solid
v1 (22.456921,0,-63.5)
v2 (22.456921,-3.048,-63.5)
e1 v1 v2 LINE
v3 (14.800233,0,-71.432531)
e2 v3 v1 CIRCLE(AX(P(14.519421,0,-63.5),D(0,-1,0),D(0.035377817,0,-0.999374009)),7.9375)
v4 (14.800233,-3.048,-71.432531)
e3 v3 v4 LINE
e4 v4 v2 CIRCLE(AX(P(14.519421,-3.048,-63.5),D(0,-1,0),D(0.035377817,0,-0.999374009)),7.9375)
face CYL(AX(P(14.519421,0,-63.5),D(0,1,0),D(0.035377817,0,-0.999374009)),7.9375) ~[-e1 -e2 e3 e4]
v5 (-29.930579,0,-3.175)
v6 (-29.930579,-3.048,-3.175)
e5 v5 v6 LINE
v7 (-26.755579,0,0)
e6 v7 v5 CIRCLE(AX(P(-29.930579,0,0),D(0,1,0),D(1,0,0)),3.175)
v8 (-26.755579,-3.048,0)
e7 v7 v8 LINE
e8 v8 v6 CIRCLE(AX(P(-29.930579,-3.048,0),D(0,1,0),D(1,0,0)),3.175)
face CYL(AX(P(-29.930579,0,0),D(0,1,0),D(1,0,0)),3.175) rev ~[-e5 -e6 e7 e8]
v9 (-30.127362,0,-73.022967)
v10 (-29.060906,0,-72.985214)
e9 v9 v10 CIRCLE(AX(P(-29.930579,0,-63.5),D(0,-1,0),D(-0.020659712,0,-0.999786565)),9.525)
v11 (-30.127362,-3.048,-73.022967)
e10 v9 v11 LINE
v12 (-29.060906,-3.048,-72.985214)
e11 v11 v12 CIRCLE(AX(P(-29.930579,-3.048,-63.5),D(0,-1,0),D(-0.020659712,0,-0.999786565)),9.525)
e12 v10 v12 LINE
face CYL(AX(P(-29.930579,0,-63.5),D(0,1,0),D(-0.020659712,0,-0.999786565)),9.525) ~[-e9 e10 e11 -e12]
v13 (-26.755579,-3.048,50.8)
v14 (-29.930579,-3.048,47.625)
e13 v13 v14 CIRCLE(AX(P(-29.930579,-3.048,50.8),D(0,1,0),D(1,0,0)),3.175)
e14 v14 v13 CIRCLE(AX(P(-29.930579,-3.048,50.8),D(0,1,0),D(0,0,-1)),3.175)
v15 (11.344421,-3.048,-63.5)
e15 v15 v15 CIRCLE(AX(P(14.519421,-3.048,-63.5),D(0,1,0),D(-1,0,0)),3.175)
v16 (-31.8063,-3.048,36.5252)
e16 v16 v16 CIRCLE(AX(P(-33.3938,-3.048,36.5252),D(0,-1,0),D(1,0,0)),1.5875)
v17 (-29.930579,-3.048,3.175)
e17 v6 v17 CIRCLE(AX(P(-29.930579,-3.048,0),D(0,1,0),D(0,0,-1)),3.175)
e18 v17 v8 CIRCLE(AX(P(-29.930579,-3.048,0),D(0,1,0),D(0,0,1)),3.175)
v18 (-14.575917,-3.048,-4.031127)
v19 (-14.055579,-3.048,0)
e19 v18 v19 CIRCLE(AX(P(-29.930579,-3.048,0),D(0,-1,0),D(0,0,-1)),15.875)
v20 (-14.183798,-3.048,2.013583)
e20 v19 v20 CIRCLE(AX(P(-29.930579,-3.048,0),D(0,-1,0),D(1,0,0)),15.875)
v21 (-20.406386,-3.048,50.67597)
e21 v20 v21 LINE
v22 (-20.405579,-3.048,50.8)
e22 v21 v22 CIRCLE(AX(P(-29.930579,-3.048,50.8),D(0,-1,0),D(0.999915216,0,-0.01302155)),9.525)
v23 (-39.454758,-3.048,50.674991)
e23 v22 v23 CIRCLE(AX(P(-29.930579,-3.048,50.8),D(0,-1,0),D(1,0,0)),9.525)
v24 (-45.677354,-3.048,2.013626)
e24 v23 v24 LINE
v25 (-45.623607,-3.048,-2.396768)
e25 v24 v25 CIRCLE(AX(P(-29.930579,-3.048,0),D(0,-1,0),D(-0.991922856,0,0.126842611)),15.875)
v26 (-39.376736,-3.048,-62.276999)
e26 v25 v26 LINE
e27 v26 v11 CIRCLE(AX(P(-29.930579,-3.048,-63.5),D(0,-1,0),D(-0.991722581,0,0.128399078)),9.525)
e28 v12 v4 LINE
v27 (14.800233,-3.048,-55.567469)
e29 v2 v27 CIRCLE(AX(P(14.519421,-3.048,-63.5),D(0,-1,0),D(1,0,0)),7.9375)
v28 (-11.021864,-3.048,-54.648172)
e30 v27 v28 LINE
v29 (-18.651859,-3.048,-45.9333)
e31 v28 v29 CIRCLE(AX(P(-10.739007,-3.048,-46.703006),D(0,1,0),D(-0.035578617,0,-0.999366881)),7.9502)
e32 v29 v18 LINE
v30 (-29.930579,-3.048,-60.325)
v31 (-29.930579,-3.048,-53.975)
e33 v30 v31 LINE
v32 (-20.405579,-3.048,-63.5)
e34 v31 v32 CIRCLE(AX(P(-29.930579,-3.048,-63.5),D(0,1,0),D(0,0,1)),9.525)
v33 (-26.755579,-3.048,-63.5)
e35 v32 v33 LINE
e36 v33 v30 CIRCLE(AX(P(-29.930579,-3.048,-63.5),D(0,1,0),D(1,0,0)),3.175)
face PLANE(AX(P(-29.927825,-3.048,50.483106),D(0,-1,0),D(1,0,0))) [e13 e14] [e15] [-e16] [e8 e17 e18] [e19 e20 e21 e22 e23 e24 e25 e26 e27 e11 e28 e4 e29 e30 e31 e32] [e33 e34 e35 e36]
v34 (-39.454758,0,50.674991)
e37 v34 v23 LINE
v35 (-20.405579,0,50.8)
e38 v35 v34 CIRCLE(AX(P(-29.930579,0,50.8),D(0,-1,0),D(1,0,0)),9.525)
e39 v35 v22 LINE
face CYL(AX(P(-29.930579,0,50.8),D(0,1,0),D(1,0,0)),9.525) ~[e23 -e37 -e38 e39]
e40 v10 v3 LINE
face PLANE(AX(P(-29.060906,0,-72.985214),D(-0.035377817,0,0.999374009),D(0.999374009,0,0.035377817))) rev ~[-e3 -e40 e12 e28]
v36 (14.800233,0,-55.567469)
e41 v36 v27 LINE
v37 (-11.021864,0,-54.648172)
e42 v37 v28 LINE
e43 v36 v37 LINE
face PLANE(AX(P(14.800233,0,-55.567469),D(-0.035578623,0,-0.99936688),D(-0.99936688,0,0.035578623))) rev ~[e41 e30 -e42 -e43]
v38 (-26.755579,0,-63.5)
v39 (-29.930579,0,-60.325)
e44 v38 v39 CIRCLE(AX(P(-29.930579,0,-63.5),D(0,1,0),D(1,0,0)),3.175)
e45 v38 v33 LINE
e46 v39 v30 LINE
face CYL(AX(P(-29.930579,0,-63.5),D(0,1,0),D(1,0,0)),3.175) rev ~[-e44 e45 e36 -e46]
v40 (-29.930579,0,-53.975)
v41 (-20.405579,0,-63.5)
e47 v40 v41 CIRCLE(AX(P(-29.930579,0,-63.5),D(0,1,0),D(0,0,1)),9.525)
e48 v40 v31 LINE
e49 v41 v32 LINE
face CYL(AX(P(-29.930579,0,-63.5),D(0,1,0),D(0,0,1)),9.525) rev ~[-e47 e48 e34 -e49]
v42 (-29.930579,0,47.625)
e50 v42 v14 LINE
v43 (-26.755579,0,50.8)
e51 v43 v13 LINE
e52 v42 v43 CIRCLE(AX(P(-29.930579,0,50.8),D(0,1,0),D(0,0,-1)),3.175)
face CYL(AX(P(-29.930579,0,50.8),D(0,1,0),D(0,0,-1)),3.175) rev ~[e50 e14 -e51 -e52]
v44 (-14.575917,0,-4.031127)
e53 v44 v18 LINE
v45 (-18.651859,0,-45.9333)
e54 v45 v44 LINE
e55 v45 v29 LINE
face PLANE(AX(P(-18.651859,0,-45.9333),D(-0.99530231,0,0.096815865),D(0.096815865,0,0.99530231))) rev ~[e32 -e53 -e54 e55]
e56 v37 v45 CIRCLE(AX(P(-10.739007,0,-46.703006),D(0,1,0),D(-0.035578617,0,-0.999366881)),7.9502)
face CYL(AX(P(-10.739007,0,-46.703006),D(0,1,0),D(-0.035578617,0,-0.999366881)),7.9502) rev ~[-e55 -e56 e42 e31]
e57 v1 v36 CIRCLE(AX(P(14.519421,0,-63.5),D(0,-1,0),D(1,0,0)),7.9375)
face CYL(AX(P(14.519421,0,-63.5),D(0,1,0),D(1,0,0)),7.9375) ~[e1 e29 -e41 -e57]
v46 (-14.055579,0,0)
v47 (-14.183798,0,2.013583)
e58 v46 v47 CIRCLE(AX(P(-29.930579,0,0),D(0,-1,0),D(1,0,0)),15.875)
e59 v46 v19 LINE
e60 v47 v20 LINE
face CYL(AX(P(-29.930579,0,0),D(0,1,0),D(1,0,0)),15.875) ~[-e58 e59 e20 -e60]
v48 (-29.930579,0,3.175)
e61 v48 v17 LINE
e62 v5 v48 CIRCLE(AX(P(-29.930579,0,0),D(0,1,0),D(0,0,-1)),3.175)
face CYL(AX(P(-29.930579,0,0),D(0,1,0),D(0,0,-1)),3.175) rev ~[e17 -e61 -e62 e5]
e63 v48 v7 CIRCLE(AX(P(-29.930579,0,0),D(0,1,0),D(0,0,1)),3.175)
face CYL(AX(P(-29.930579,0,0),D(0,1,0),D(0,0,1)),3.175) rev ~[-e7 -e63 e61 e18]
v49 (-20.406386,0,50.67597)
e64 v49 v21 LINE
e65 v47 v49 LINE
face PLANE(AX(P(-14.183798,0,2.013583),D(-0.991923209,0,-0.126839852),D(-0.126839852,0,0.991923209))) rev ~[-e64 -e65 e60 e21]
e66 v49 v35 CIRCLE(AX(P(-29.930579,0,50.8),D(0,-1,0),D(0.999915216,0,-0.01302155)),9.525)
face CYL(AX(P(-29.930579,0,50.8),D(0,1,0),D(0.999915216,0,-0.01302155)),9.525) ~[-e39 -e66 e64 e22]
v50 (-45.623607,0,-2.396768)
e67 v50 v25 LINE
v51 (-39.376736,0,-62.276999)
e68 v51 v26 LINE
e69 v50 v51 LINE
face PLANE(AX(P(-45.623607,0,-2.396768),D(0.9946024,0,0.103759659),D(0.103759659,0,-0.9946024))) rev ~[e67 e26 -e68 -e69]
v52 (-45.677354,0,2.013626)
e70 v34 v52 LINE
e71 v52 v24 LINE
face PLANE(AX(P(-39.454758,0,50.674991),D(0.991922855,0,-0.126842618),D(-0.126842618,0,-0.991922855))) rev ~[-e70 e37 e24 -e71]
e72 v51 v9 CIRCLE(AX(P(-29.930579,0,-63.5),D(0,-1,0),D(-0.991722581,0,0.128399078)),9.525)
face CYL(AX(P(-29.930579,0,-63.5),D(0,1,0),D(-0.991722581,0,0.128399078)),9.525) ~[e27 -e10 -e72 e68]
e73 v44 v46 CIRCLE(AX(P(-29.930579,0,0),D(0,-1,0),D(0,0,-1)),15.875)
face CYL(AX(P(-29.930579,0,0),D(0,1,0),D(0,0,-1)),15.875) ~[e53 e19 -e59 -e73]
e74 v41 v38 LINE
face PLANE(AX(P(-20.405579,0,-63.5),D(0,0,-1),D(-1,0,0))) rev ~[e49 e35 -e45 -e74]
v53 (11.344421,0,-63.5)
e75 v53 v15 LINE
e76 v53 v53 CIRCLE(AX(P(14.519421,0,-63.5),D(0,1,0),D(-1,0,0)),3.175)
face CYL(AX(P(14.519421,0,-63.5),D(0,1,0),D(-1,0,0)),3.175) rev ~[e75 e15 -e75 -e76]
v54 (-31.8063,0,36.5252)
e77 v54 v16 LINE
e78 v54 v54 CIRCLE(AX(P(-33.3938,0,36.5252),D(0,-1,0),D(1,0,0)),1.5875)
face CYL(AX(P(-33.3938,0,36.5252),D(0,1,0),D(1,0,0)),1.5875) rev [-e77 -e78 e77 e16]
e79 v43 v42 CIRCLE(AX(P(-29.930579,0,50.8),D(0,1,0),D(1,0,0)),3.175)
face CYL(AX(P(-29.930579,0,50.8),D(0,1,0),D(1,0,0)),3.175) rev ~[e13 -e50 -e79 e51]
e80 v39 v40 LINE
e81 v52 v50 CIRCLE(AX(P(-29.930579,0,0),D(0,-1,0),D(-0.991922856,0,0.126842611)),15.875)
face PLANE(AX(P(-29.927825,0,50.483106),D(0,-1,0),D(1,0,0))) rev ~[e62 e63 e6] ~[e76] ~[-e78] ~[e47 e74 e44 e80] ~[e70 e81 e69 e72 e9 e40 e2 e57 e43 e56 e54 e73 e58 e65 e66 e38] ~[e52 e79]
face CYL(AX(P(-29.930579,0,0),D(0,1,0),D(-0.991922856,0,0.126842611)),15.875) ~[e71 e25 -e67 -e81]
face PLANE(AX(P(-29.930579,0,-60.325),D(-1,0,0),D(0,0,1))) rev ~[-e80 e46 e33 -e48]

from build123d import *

# Parameters (mm, degrees)
F0_R     = 1.5875
F1_DEPTH = 3.048


# Not quite as in the source:
# - ends of sketch curves that miss each other by under 0.0002 mm in the source are joined


with BuildPart() as f1:
    # F0 (on Front) → F1 (new body)
    with BuildSketch(Plane.XZ):
        with BuildLine():
            ThreePointArc((-20.4063861121, 50.6759697353), (-20.4057804387, 50.7379835531), (-20.4055785447, 50.8))
            ThreePointArc((-20.4055785447, 50.8), (-29.9930844021, 60.3247949069), (-39.454758181, 50.6749909771))
            ThreePointArc((-39.454758181, 50.6749909771), (-36.6214272972, 44.0207546164), (-29.9305785447, 41.275))
            ThreePointArc((-29.9305785447, 41.275), (-23.2393814647, 44.0210984197), (-20.4063861121, 50.6759697353))
        make_face()
        with BuildLine():
            ThreePointArc((-26.7555785447, 50.8), (-27.6855145145, 48.5549359697), (-29.9305785447, 47.625))
            ThreePointArc((-29.9305785447, 47.625), (-32.175642575, 53.0450640303), (-26.7555785447, 50.8))
        make_face(mode=Mode.SUBTRACT)
        with BuildLine():
            ThreePointArc((-29.9305785447, 41.275), (-36.6214272972, 44.0207546164), (-39.454758181, 50.6749909771))
            Line((-39.454758181, 50.6749909771), (-45.6773538826, 2.0136264451))
            ThreePointArc((-45.6773538826, 2.0136264451), (-40.4198422268, 11.9159964924), (-29.9305785447, 15.875))
            Line((-29.9305785447, 15.875), (-29.9305785447, 41.275))
        make_face()
        with Locations((-33.3938002586, 36.5252)):
            Circle(F0_R, mode=Mode.SUBTRACT)
        with BuildLine():
            Line((-14.1837976059, 2.0135826444), (-20.4063861121, 50.6759697353))
            ThreePointArc((-20.4063861121, 50.6759697353), (-23.2393814647, 44.0210984197), (-29.9305785447, 41.275))
            Line((-29.9305785447, 41.275), (-29.9305785447, 15.875))
            ThreePointArc((-29.9305785447, 15.875), (-19.4412982901, 11.9159819041), (-14.1837976059, 2.0135826444))
        make_face()
        with BuildLine():
            ThreePointArc((-29.9305785447, 15.875), (-40.4198422268, 11.9159964924), (-45.6773538826, 2.0136264451))
            ThreePointArc((-45.6773538826, 2.0136264451), (-45.8043998708, -0.1934463924), (-45.6236065946, -2.3967677453))
            ThreePointArc((-45.6236065946, -2.3967677453), (-40.2738598675, -12.0429297298), (-29.9305785447, -15.875))
            Line((-29.9305785447, -15.875), (-29.9305785447, -3.175))
            ThreePointArc((-29.9305785447, -3.175), (-33.1055785447, 0), (-29.9305785447, 3.175))
            Line((-29.9305785447, 3.175), (-29.9305785447, 15.875))
        make_face()
        with BuildLine():
            ThreePointArc((-14.0555785447, 0), (-14.087665738, 1.0088304111), (-14.1837976059, 2.0135826444))
            ThreePointArc((-14.1837976059, 2.0135826444), (-19.4412982901, 11.9159819041), (-29.9305785447, 15.875))
            Line((-29.9305785447, 15.875), (-29.9305785447, 3.175))
            ThreePointArc((-29.9305785447, 3.175), (-27.6855145145, 2.2450640303), (-26.7555785447, 0))
            ThreePointArc((-26.7555785447, 0), (-27.6855145145, -2.2450640303), (-29.9305785447, -3.175))
            Line((-29.9305785447, -3.175), (-29.9305785447, -15.875))
            ThreePointArc((-29.9305785447, -15.875), (-20.2346648726, -12.5699993263), (-14.5759167084, -4.031127))
            ThreePointArc((-14.5759167084, -4.031127), (-14.1862004743, -2.0322854558), (-14.0555785447, 0))
        make_face()
        with BuildLine():
            ThreePointArc((-29.9305785447, -15.875), (-40.2738598675, -12.0429297298), (-45.6236065946, -2.3967677453))
            Line((-45.6236065946, -2.3967677453), (-39.3767361242, -62.2769987798))
            ThreePointArc((-39.3767361242, -62.2769987798), (-36.2185248858, -56.3454660661), (-29.9305785447, -53.975))
            Line((-29.9305785447, -53.975), (-29.9305785447, -15.875))
        make_face()
        with BuildLine():
            ThreePointArc((-14.5759167084, -4.031127), (-20.2346648726, -12.5699993263), (-29.9305785447, -15.875))
            Line((-29.9305785447, -15.875), (-29.9305785447, -53.975))
            ThreePointArc((-29.9305785447, -53.975), (-23.1953864539, -56.7648079092), (-20.4055785447, -63.5))
            Line((-20.4055785447, -63.5), (6.5819214553, -63.5))
            ThreePointArc((6.5819214553, -63.5), (9.0069371863, -57.7889209921), (14.8002328719, -55.5674688026))
            Line((14.8002328719, -55.5674688026), (-11.021864061, -54.648172114))
            ThreePointArc((-11.021864061, -54.648172114), (-16.7206173005, -51.9399910767), (-18.6518593628, -45.9333000481))
            Line((-18.6518593628, -45.9333000481), (-14.5759167084, -4.031127))
        make_face()
        with BuildLine():
            ThreePointArc((-29.9305785447, -53.975), (-36.2185248858, -56.3454660661), (-39.3767361242, -62.2769987798))
            ThreePointArc((-39.3767361242, -62.2769987798), (-37.1496877578, -69.7137015675), (-30.1273622995, -73.0229670352))
            Line((-30.1273622995, -73.0229670352), (-29.0609056002, -72.9852144925))
            ThreePointArc((-29.0609056002, -72.9852144925), (-22.8946258802, -69.920357864), (-20.4055785447, -63.5))
            Line((-20.4055785447, -63.5), (-26.7555785447, -63.5))
            ThreePointArc((-26.7555785447, -63.5), (-32.175642575, -65.7450640303), (-29.9305785447, -60.325))
            Line((-29.9305785447, -60.325), (-29.9305785447, -53.975))
        make_face()
        with BuildLine():
            Line((-29.0609056002, -72.9852144925), (-30.1273622995, -73.0229670352))
            ThreePointArc((-30.1273622995, -73.0229670352), (-29.593604838, -73.0190374367), (-29.0609056002, -72.9852144925))
        make_face()
        with BuildLine():
            Line((6.5819214553, -63.5), (-20.4055785447, -63.5))
            ThreePointArc((-20.4055785447, -63.5), (-22.8946258802, -69.920357864), (-29.0609056002, -72.9852144925))
            Line((-29.0609056002, -72.9852144925), (14.8002328776, -71.4325311972))
            ThreePointArc((14.8002328776, -71.4325311972), (9.0069371884, -69.2110790099), (6.5819214553, -63.5))
        make_face()
        with BuildLine():
            ThreePointArc((14.8002328719, -55.5674688026), (9.0069371863, -57.7889209921), (6.5819214553, -63.5))
            ThreePointArc((6.5819214553, -63.5), (9.0069371884, -69.2110790099), (14.8002328776, -71.4325311972))
            ThreePointArc((14.8002328776, -71.4325311972), (20.2305004652, -69.0124842669), (22.4569214553, -63.5))
            ThreePointArc((22.4569214553, -63.5), (20.2305004632, -57.9875157311), (14.8002328719, -55.5674688026))
        make_face()
        with BuildLine():
            ThreePointArc((17.6944214553, -63.5), (14.5194214553, -66.675), (11.3444214553, -63.5))
            ThreePointArc((11.3444214553, -63.5), (14.5194214553, -60.325), (17.6944214553, -63.5))
        make_face(mode=Mode.SUBTRACT)
    extrude(amount=F1_DEPTH)


solid = f1.part
